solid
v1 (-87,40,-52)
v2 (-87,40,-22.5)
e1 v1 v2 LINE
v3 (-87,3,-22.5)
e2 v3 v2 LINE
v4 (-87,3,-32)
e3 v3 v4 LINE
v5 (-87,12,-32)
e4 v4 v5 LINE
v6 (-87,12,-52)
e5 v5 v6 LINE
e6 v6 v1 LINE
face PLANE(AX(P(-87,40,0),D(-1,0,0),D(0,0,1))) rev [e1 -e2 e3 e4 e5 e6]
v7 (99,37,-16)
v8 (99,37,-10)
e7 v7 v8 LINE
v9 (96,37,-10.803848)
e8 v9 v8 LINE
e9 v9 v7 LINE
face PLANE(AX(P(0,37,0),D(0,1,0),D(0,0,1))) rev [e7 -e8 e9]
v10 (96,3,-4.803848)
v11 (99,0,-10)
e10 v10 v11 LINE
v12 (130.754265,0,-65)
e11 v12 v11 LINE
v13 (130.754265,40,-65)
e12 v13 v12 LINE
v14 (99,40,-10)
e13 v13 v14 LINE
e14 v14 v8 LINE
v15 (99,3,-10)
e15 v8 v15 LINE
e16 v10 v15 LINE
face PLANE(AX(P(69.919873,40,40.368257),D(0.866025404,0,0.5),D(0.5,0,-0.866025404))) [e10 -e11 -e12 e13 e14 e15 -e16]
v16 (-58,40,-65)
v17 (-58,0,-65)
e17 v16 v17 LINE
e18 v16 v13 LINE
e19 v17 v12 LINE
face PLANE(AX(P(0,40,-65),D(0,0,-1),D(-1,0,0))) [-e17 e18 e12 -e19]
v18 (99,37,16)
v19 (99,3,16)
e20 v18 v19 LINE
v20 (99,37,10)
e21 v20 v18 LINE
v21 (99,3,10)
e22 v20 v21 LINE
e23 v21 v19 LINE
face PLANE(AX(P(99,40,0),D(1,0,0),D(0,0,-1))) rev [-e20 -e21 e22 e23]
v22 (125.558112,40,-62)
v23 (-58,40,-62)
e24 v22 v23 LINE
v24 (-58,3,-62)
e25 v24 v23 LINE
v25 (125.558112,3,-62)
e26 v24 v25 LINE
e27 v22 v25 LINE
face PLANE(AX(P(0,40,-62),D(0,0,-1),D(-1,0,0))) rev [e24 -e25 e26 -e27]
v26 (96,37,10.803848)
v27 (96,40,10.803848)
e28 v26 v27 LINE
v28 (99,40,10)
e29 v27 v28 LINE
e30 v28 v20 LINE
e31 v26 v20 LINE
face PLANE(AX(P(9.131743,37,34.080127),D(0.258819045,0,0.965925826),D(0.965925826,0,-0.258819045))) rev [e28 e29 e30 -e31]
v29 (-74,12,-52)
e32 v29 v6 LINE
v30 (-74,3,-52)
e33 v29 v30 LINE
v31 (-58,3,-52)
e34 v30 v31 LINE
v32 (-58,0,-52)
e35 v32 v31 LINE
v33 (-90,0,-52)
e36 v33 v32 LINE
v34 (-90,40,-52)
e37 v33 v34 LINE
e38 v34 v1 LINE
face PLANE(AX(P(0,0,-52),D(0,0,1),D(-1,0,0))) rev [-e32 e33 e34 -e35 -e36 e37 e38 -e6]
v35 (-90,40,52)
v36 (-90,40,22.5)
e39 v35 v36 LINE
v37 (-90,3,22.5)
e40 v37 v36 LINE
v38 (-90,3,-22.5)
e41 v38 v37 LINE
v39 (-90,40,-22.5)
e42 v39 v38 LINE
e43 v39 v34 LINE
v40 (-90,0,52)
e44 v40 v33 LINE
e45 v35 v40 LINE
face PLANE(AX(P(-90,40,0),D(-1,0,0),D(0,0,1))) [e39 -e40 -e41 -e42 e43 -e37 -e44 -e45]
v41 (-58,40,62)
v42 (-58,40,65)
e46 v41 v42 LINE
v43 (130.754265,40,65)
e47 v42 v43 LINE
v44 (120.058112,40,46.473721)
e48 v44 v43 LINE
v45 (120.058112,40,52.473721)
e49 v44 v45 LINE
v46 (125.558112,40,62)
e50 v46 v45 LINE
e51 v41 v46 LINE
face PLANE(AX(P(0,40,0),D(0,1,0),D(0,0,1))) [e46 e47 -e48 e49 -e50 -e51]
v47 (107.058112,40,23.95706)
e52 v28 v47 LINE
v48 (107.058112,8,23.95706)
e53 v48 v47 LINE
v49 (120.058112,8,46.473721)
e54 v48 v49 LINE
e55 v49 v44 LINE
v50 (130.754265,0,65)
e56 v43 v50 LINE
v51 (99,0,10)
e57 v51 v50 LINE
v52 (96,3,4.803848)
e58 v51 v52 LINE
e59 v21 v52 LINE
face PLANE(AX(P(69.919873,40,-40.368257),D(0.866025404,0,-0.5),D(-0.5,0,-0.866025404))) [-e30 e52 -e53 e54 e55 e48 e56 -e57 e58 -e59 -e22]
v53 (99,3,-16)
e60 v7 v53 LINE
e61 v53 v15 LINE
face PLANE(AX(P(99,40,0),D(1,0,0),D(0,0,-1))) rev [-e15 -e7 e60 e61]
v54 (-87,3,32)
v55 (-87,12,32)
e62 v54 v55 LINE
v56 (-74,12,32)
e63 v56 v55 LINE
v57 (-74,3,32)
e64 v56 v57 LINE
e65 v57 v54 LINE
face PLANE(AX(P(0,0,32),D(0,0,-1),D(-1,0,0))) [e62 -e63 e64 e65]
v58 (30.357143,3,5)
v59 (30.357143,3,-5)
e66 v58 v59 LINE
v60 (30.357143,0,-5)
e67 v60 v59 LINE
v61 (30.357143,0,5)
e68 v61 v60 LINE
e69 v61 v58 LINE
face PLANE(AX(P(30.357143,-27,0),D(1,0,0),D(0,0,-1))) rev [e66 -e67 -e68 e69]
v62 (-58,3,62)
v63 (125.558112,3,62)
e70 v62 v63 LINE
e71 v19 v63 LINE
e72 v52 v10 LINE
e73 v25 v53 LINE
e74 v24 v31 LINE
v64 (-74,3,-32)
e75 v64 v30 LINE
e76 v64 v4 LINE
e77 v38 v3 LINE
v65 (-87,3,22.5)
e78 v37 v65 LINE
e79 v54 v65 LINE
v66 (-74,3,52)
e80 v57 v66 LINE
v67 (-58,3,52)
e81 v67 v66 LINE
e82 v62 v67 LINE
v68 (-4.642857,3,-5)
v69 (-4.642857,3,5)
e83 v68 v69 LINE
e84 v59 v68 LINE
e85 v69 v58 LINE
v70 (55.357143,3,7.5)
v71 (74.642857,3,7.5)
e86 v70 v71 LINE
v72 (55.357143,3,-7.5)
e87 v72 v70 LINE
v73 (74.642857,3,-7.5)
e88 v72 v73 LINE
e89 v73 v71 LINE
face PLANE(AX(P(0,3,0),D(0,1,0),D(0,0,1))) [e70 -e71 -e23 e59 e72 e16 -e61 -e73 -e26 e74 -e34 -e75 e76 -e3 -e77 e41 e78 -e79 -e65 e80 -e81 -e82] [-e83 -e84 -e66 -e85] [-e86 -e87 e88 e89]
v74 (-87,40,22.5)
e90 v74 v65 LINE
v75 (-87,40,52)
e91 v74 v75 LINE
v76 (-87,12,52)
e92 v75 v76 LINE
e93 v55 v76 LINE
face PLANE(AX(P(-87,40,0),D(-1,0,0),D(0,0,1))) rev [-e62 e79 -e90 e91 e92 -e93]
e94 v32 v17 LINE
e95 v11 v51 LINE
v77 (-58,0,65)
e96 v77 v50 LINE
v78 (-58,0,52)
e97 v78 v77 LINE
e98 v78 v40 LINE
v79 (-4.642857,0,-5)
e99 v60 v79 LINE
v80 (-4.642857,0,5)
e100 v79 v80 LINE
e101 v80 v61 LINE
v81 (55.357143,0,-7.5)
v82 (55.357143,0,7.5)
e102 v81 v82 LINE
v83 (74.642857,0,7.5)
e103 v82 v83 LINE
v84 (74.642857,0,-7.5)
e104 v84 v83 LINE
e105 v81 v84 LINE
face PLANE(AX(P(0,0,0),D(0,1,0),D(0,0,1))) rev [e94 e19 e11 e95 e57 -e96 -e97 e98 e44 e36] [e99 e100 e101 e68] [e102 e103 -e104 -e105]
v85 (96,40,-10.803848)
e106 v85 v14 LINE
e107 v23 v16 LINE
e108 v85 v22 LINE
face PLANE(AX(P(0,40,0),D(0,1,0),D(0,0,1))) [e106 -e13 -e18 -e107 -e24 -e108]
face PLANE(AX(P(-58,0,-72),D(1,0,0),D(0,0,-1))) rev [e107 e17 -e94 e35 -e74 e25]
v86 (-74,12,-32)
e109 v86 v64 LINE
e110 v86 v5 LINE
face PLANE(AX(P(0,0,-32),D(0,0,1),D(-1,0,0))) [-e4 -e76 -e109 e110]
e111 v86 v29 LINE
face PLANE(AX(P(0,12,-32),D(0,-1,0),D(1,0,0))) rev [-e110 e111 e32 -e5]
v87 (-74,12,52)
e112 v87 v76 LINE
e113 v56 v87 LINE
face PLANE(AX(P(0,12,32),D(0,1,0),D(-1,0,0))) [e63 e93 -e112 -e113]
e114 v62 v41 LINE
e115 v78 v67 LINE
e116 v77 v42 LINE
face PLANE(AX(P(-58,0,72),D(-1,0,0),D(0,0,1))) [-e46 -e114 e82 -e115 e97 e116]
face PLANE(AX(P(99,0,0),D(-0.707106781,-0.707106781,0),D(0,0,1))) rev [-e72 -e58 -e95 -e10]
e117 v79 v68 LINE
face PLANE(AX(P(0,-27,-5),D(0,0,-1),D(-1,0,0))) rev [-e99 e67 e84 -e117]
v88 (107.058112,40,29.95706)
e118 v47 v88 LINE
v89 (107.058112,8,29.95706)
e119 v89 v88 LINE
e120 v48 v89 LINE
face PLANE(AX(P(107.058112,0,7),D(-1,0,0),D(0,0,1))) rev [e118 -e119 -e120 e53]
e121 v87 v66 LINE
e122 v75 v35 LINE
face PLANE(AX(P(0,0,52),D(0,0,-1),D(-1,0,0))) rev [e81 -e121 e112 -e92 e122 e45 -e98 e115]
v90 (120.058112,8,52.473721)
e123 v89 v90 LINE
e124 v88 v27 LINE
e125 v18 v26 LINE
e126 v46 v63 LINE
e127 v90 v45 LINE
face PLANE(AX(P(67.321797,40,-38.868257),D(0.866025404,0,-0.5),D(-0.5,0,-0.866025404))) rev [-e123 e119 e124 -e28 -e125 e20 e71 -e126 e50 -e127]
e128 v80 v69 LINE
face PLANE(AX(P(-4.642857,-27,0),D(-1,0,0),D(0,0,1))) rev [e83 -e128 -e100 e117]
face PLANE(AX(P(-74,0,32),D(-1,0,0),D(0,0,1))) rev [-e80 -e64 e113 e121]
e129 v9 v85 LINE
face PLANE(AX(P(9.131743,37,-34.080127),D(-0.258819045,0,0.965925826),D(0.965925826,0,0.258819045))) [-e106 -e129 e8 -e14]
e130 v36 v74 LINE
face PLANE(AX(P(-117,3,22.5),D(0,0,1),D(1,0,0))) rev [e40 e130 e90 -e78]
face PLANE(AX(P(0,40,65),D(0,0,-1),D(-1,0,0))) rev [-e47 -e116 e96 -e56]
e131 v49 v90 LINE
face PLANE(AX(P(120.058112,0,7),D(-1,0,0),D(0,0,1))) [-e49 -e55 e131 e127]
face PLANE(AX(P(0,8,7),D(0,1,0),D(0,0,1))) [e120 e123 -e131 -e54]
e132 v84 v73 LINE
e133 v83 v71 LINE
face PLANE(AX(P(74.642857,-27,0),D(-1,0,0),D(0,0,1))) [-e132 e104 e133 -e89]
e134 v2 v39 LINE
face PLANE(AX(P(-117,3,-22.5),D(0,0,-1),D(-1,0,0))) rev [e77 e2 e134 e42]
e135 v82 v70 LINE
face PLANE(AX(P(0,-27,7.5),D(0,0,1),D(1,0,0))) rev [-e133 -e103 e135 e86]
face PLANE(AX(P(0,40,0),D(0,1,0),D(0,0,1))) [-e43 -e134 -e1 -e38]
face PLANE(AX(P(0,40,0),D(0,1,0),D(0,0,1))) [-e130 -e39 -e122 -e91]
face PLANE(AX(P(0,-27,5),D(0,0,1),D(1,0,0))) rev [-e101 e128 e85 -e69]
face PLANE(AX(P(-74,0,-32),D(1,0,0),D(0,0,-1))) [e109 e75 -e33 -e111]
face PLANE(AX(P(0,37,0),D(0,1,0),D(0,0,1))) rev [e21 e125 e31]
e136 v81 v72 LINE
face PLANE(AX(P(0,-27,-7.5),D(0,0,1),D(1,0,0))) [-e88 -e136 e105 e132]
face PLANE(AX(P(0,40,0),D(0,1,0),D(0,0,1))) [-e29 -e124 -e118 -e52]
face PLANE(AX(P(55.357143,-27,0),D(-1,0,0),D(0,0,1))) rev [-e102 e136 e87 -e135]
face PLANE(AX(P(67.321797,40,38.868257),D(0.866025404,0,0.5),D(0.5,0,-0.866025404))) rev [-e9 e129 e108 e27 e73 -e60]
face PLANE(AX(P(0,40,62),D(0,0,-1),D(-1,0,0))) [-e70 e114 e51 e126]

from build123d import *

# Parameters (mm, degrees)
BOSS_EXTRUDE1_DEPTH = 40
SHELL5_START        = 3
SHELL5_DEPTH        = 34
CHAMFER1_SIZE       = 3
CUT_EXTRUDE1_DEPTH  = 3
SKETCH7_W           = 13
SKETCH7_H           = 9
CUT_EXTRUDE3_DEPTH  = 10
SKETCH7_4_W         = 13
SKETCH7_4_H         = 9
BOSS_EXTRUDE7_DEPTH = 30
CUT_EXTRUDE8_DEPTH  = 55
SKETCH7_6_W         = 13
SKETCH7_6_H         = 9
CUT_EXTRUDE10_DEPTH = 10
SKETCH8_W           = 45
SKETCH8_H           = 40
CUT_EXTRUDE4_DEPTH  = 30
SKETCH9_W           = 19.285714286
SKETCH9_H           = 15
SKETCH9_W_2         = 35
SKETCH9_H_2         = 10
CUT_EXTRUDE5_DEPTH  = 30


# Read off the part's stored shape, not the designer's step: Shell5
with BuildPart() as part:
    # Sketch1 → Boss-Extrude1 (new body)
    with BuildSketch(Plane(origin=(0, 0, 0), x_dir=(1, 0, 0), z_dir=(0, 1, 0))):
        Polygon((-90, -65), (130.754264805, -65), (99, -10), (99, 10), (130.754264805, 65), (-90, 65), align=None)
    extrude(amount=BOSS_EXTRUDE1_DEPTH)

    # Shell5 outline → Shell5 (cut)
    with BuildSketch(Plane(origin=(0, 0, 0), x_dir=(1, 0, 0), z_dir=(0, 1, 0)).offset(SHELL5_START)):
        Polygon((99, -16), (99, 16), (125.558112383, 62), (-87, 62), (-87, -62), (125.558112383, -62), align=None)
    extrude(amount=SHELL5_DEPTH, mode=Mode.SUBTRACT)

    # Chamfer1
    chamfer1_edges = [part.edges().sort_by_distance(p)[0] for p in [
        (99, 3, 0),
    ]]
    chamfer(chamfer1_edges, length=CHAMFER1_SIZE - 0.0001)  # a hair under: the kernel refuses the full size

    # Sketch6 → Cut-Extrude1 (cut)
    with BuildSketch(Plane(origin=(0, 40, 0), x_dir=(1, 0, 0), z_dir=(0, 1, 0))):
        Polygon((125.558112383, 62), (-87, 62), (-87, -62), (125.558112383, -62), (96, -10.803847577), (96, 10.803847577), align=None)
        Polygon((99, 10), (96, 10.803847577), (96, -10.803847577), (99, -10), align=None)
    extrude(amount=-CUT_EXTRUDE1_DEPTH, mode=Mode.SUBTRACT)

    # Sketch7 → Cut-Extrude3 (cut)
    with BuildSketch(Plane(origin=(0, 0, 62), x_dir=(-1, 0, 0), z_dir=(0, 0, -1))):
        Polygon((58, 3), (58, -4.5), (103, -4.5), (103, 40.5), (58, 40.5), (58, 40), (87, 40), (87, 12), (87, 3), (74, 3), align=None)
        Polygon((58, 40), (58, 3), (74, 3), (74, 12), (87, 12), (87, 40), align=None)
        with Locations((80.5, 7.5)):
            Rectangle(SKETCH7_W, SKETCH7_H)
    cut_extrude3 = extrude(amount=-CUT_EXTRUDE3_DEPTH, mode=Mode.SUBTRACT)

    # Sketch7<4> → Boss-Extrude7 (add)
    with BuildSketch(Plane(origin=(0, 0, 62), x_dir=(-1, 0, 0), z_dir=(0, 0, -1))):
        with Locations((80.5, 7.5)):
            Rectangle(SKETCH7_4_W, SKETCH7_4_H)
    boss_extrude7 = extrude(amount=BOSS_EXTRUDE7_DEPTH)

    # Sketch12 → Cut-Extrude8 (cut)
    with BuildSketch(Plane(origin=(0, 0, 62), x_dir=(-1, 0, 0), z_dir=(0, 0, -1))):
        Polygon((-107.058112383, 43), (-107.058112383, 8), (-120.058112383, 43), align=None)
        Polygon((-120.058112383, 43), (-120.058112383, 8), (-107.058112383, 8), align=None)
        Polygon((-107.058112383, 40), (-118.943826668, 40), (-107.058112383, 8), align=None)
    extrude(amount=CUT_EXTRUDE8_DEPTH, mode=Mode.SUBTRACT)

    # Sketch7<6> → Cut-Extrude10 (cut)
    with BuildSketch(Plane(origin=(0, 0, 62), x_dir=(-1, 0, 0), z_dir=(0, 0, -1))):
        Polygon((58, 3), (58, -4.5), (103, -4.5), (103, 40.5), (58, 40.5), (58, 40), (87, 40), (87, 12), (87, 3), (74, 3), align=None)
        with Locations((80.5, 7.5)):
            Rectangle(SKETCH7_6_W, SKETCH7_6_H)
        Polygon((58, 40), (58, 3), (74, 3), (74, 12), (87, 12), (87, 40), align=None)
    cut_extrude10 = extrude(amount=CUT_EXTRUDE10_DEPTH, mode=Mode.SUBTRACT)

    # Mirror6: Cut-Extrude3, Boss-Extrude7, Cut-Extrude10 across plane
    add(cut_extrude3.mirror(Plane.XY), mode=Mode.SUBTRACT)
    add(boss_extrude7.mirror(Plane.XY))
    add(cut_extrude10.mirror(Plane.XY), mode=Mode.SUBTRACT)

    # Sketch8 → Cut-Extrude4 (cut)
    with BuildSketch(Plane(origin=(-87, 0, 0), x_dir=(0, 0, -1), z_dir=(1, 0, 0))):
        with Locations((0, 23)):
            Rectangle(SKETCH8_W, SKETCH8_H)
    extrude(amount=-CUT_EXTRUDE4_DEPTH, mode=Mode.SUBTRACT)

    # Sketch9 → Cut-Extrude5 (cut)
    with BuildSketch(Plane(origin=(0, 3, 0), x_dir=(1, 0, 0), z_dir=(0, 1, 0))):
        with Locations((65, 0)):
            Rectangle(SKETCH9_W, SKETCH9_H)
        with Locations((12.857142857, 0)):
            Rectangle(SKETCH9_W_2, SKETCH9_H_2)
    extrude(amount=-CUT_EXTRUDE5_DEPTH, mode=Mode.SUBTRACT)


solid = part.part
